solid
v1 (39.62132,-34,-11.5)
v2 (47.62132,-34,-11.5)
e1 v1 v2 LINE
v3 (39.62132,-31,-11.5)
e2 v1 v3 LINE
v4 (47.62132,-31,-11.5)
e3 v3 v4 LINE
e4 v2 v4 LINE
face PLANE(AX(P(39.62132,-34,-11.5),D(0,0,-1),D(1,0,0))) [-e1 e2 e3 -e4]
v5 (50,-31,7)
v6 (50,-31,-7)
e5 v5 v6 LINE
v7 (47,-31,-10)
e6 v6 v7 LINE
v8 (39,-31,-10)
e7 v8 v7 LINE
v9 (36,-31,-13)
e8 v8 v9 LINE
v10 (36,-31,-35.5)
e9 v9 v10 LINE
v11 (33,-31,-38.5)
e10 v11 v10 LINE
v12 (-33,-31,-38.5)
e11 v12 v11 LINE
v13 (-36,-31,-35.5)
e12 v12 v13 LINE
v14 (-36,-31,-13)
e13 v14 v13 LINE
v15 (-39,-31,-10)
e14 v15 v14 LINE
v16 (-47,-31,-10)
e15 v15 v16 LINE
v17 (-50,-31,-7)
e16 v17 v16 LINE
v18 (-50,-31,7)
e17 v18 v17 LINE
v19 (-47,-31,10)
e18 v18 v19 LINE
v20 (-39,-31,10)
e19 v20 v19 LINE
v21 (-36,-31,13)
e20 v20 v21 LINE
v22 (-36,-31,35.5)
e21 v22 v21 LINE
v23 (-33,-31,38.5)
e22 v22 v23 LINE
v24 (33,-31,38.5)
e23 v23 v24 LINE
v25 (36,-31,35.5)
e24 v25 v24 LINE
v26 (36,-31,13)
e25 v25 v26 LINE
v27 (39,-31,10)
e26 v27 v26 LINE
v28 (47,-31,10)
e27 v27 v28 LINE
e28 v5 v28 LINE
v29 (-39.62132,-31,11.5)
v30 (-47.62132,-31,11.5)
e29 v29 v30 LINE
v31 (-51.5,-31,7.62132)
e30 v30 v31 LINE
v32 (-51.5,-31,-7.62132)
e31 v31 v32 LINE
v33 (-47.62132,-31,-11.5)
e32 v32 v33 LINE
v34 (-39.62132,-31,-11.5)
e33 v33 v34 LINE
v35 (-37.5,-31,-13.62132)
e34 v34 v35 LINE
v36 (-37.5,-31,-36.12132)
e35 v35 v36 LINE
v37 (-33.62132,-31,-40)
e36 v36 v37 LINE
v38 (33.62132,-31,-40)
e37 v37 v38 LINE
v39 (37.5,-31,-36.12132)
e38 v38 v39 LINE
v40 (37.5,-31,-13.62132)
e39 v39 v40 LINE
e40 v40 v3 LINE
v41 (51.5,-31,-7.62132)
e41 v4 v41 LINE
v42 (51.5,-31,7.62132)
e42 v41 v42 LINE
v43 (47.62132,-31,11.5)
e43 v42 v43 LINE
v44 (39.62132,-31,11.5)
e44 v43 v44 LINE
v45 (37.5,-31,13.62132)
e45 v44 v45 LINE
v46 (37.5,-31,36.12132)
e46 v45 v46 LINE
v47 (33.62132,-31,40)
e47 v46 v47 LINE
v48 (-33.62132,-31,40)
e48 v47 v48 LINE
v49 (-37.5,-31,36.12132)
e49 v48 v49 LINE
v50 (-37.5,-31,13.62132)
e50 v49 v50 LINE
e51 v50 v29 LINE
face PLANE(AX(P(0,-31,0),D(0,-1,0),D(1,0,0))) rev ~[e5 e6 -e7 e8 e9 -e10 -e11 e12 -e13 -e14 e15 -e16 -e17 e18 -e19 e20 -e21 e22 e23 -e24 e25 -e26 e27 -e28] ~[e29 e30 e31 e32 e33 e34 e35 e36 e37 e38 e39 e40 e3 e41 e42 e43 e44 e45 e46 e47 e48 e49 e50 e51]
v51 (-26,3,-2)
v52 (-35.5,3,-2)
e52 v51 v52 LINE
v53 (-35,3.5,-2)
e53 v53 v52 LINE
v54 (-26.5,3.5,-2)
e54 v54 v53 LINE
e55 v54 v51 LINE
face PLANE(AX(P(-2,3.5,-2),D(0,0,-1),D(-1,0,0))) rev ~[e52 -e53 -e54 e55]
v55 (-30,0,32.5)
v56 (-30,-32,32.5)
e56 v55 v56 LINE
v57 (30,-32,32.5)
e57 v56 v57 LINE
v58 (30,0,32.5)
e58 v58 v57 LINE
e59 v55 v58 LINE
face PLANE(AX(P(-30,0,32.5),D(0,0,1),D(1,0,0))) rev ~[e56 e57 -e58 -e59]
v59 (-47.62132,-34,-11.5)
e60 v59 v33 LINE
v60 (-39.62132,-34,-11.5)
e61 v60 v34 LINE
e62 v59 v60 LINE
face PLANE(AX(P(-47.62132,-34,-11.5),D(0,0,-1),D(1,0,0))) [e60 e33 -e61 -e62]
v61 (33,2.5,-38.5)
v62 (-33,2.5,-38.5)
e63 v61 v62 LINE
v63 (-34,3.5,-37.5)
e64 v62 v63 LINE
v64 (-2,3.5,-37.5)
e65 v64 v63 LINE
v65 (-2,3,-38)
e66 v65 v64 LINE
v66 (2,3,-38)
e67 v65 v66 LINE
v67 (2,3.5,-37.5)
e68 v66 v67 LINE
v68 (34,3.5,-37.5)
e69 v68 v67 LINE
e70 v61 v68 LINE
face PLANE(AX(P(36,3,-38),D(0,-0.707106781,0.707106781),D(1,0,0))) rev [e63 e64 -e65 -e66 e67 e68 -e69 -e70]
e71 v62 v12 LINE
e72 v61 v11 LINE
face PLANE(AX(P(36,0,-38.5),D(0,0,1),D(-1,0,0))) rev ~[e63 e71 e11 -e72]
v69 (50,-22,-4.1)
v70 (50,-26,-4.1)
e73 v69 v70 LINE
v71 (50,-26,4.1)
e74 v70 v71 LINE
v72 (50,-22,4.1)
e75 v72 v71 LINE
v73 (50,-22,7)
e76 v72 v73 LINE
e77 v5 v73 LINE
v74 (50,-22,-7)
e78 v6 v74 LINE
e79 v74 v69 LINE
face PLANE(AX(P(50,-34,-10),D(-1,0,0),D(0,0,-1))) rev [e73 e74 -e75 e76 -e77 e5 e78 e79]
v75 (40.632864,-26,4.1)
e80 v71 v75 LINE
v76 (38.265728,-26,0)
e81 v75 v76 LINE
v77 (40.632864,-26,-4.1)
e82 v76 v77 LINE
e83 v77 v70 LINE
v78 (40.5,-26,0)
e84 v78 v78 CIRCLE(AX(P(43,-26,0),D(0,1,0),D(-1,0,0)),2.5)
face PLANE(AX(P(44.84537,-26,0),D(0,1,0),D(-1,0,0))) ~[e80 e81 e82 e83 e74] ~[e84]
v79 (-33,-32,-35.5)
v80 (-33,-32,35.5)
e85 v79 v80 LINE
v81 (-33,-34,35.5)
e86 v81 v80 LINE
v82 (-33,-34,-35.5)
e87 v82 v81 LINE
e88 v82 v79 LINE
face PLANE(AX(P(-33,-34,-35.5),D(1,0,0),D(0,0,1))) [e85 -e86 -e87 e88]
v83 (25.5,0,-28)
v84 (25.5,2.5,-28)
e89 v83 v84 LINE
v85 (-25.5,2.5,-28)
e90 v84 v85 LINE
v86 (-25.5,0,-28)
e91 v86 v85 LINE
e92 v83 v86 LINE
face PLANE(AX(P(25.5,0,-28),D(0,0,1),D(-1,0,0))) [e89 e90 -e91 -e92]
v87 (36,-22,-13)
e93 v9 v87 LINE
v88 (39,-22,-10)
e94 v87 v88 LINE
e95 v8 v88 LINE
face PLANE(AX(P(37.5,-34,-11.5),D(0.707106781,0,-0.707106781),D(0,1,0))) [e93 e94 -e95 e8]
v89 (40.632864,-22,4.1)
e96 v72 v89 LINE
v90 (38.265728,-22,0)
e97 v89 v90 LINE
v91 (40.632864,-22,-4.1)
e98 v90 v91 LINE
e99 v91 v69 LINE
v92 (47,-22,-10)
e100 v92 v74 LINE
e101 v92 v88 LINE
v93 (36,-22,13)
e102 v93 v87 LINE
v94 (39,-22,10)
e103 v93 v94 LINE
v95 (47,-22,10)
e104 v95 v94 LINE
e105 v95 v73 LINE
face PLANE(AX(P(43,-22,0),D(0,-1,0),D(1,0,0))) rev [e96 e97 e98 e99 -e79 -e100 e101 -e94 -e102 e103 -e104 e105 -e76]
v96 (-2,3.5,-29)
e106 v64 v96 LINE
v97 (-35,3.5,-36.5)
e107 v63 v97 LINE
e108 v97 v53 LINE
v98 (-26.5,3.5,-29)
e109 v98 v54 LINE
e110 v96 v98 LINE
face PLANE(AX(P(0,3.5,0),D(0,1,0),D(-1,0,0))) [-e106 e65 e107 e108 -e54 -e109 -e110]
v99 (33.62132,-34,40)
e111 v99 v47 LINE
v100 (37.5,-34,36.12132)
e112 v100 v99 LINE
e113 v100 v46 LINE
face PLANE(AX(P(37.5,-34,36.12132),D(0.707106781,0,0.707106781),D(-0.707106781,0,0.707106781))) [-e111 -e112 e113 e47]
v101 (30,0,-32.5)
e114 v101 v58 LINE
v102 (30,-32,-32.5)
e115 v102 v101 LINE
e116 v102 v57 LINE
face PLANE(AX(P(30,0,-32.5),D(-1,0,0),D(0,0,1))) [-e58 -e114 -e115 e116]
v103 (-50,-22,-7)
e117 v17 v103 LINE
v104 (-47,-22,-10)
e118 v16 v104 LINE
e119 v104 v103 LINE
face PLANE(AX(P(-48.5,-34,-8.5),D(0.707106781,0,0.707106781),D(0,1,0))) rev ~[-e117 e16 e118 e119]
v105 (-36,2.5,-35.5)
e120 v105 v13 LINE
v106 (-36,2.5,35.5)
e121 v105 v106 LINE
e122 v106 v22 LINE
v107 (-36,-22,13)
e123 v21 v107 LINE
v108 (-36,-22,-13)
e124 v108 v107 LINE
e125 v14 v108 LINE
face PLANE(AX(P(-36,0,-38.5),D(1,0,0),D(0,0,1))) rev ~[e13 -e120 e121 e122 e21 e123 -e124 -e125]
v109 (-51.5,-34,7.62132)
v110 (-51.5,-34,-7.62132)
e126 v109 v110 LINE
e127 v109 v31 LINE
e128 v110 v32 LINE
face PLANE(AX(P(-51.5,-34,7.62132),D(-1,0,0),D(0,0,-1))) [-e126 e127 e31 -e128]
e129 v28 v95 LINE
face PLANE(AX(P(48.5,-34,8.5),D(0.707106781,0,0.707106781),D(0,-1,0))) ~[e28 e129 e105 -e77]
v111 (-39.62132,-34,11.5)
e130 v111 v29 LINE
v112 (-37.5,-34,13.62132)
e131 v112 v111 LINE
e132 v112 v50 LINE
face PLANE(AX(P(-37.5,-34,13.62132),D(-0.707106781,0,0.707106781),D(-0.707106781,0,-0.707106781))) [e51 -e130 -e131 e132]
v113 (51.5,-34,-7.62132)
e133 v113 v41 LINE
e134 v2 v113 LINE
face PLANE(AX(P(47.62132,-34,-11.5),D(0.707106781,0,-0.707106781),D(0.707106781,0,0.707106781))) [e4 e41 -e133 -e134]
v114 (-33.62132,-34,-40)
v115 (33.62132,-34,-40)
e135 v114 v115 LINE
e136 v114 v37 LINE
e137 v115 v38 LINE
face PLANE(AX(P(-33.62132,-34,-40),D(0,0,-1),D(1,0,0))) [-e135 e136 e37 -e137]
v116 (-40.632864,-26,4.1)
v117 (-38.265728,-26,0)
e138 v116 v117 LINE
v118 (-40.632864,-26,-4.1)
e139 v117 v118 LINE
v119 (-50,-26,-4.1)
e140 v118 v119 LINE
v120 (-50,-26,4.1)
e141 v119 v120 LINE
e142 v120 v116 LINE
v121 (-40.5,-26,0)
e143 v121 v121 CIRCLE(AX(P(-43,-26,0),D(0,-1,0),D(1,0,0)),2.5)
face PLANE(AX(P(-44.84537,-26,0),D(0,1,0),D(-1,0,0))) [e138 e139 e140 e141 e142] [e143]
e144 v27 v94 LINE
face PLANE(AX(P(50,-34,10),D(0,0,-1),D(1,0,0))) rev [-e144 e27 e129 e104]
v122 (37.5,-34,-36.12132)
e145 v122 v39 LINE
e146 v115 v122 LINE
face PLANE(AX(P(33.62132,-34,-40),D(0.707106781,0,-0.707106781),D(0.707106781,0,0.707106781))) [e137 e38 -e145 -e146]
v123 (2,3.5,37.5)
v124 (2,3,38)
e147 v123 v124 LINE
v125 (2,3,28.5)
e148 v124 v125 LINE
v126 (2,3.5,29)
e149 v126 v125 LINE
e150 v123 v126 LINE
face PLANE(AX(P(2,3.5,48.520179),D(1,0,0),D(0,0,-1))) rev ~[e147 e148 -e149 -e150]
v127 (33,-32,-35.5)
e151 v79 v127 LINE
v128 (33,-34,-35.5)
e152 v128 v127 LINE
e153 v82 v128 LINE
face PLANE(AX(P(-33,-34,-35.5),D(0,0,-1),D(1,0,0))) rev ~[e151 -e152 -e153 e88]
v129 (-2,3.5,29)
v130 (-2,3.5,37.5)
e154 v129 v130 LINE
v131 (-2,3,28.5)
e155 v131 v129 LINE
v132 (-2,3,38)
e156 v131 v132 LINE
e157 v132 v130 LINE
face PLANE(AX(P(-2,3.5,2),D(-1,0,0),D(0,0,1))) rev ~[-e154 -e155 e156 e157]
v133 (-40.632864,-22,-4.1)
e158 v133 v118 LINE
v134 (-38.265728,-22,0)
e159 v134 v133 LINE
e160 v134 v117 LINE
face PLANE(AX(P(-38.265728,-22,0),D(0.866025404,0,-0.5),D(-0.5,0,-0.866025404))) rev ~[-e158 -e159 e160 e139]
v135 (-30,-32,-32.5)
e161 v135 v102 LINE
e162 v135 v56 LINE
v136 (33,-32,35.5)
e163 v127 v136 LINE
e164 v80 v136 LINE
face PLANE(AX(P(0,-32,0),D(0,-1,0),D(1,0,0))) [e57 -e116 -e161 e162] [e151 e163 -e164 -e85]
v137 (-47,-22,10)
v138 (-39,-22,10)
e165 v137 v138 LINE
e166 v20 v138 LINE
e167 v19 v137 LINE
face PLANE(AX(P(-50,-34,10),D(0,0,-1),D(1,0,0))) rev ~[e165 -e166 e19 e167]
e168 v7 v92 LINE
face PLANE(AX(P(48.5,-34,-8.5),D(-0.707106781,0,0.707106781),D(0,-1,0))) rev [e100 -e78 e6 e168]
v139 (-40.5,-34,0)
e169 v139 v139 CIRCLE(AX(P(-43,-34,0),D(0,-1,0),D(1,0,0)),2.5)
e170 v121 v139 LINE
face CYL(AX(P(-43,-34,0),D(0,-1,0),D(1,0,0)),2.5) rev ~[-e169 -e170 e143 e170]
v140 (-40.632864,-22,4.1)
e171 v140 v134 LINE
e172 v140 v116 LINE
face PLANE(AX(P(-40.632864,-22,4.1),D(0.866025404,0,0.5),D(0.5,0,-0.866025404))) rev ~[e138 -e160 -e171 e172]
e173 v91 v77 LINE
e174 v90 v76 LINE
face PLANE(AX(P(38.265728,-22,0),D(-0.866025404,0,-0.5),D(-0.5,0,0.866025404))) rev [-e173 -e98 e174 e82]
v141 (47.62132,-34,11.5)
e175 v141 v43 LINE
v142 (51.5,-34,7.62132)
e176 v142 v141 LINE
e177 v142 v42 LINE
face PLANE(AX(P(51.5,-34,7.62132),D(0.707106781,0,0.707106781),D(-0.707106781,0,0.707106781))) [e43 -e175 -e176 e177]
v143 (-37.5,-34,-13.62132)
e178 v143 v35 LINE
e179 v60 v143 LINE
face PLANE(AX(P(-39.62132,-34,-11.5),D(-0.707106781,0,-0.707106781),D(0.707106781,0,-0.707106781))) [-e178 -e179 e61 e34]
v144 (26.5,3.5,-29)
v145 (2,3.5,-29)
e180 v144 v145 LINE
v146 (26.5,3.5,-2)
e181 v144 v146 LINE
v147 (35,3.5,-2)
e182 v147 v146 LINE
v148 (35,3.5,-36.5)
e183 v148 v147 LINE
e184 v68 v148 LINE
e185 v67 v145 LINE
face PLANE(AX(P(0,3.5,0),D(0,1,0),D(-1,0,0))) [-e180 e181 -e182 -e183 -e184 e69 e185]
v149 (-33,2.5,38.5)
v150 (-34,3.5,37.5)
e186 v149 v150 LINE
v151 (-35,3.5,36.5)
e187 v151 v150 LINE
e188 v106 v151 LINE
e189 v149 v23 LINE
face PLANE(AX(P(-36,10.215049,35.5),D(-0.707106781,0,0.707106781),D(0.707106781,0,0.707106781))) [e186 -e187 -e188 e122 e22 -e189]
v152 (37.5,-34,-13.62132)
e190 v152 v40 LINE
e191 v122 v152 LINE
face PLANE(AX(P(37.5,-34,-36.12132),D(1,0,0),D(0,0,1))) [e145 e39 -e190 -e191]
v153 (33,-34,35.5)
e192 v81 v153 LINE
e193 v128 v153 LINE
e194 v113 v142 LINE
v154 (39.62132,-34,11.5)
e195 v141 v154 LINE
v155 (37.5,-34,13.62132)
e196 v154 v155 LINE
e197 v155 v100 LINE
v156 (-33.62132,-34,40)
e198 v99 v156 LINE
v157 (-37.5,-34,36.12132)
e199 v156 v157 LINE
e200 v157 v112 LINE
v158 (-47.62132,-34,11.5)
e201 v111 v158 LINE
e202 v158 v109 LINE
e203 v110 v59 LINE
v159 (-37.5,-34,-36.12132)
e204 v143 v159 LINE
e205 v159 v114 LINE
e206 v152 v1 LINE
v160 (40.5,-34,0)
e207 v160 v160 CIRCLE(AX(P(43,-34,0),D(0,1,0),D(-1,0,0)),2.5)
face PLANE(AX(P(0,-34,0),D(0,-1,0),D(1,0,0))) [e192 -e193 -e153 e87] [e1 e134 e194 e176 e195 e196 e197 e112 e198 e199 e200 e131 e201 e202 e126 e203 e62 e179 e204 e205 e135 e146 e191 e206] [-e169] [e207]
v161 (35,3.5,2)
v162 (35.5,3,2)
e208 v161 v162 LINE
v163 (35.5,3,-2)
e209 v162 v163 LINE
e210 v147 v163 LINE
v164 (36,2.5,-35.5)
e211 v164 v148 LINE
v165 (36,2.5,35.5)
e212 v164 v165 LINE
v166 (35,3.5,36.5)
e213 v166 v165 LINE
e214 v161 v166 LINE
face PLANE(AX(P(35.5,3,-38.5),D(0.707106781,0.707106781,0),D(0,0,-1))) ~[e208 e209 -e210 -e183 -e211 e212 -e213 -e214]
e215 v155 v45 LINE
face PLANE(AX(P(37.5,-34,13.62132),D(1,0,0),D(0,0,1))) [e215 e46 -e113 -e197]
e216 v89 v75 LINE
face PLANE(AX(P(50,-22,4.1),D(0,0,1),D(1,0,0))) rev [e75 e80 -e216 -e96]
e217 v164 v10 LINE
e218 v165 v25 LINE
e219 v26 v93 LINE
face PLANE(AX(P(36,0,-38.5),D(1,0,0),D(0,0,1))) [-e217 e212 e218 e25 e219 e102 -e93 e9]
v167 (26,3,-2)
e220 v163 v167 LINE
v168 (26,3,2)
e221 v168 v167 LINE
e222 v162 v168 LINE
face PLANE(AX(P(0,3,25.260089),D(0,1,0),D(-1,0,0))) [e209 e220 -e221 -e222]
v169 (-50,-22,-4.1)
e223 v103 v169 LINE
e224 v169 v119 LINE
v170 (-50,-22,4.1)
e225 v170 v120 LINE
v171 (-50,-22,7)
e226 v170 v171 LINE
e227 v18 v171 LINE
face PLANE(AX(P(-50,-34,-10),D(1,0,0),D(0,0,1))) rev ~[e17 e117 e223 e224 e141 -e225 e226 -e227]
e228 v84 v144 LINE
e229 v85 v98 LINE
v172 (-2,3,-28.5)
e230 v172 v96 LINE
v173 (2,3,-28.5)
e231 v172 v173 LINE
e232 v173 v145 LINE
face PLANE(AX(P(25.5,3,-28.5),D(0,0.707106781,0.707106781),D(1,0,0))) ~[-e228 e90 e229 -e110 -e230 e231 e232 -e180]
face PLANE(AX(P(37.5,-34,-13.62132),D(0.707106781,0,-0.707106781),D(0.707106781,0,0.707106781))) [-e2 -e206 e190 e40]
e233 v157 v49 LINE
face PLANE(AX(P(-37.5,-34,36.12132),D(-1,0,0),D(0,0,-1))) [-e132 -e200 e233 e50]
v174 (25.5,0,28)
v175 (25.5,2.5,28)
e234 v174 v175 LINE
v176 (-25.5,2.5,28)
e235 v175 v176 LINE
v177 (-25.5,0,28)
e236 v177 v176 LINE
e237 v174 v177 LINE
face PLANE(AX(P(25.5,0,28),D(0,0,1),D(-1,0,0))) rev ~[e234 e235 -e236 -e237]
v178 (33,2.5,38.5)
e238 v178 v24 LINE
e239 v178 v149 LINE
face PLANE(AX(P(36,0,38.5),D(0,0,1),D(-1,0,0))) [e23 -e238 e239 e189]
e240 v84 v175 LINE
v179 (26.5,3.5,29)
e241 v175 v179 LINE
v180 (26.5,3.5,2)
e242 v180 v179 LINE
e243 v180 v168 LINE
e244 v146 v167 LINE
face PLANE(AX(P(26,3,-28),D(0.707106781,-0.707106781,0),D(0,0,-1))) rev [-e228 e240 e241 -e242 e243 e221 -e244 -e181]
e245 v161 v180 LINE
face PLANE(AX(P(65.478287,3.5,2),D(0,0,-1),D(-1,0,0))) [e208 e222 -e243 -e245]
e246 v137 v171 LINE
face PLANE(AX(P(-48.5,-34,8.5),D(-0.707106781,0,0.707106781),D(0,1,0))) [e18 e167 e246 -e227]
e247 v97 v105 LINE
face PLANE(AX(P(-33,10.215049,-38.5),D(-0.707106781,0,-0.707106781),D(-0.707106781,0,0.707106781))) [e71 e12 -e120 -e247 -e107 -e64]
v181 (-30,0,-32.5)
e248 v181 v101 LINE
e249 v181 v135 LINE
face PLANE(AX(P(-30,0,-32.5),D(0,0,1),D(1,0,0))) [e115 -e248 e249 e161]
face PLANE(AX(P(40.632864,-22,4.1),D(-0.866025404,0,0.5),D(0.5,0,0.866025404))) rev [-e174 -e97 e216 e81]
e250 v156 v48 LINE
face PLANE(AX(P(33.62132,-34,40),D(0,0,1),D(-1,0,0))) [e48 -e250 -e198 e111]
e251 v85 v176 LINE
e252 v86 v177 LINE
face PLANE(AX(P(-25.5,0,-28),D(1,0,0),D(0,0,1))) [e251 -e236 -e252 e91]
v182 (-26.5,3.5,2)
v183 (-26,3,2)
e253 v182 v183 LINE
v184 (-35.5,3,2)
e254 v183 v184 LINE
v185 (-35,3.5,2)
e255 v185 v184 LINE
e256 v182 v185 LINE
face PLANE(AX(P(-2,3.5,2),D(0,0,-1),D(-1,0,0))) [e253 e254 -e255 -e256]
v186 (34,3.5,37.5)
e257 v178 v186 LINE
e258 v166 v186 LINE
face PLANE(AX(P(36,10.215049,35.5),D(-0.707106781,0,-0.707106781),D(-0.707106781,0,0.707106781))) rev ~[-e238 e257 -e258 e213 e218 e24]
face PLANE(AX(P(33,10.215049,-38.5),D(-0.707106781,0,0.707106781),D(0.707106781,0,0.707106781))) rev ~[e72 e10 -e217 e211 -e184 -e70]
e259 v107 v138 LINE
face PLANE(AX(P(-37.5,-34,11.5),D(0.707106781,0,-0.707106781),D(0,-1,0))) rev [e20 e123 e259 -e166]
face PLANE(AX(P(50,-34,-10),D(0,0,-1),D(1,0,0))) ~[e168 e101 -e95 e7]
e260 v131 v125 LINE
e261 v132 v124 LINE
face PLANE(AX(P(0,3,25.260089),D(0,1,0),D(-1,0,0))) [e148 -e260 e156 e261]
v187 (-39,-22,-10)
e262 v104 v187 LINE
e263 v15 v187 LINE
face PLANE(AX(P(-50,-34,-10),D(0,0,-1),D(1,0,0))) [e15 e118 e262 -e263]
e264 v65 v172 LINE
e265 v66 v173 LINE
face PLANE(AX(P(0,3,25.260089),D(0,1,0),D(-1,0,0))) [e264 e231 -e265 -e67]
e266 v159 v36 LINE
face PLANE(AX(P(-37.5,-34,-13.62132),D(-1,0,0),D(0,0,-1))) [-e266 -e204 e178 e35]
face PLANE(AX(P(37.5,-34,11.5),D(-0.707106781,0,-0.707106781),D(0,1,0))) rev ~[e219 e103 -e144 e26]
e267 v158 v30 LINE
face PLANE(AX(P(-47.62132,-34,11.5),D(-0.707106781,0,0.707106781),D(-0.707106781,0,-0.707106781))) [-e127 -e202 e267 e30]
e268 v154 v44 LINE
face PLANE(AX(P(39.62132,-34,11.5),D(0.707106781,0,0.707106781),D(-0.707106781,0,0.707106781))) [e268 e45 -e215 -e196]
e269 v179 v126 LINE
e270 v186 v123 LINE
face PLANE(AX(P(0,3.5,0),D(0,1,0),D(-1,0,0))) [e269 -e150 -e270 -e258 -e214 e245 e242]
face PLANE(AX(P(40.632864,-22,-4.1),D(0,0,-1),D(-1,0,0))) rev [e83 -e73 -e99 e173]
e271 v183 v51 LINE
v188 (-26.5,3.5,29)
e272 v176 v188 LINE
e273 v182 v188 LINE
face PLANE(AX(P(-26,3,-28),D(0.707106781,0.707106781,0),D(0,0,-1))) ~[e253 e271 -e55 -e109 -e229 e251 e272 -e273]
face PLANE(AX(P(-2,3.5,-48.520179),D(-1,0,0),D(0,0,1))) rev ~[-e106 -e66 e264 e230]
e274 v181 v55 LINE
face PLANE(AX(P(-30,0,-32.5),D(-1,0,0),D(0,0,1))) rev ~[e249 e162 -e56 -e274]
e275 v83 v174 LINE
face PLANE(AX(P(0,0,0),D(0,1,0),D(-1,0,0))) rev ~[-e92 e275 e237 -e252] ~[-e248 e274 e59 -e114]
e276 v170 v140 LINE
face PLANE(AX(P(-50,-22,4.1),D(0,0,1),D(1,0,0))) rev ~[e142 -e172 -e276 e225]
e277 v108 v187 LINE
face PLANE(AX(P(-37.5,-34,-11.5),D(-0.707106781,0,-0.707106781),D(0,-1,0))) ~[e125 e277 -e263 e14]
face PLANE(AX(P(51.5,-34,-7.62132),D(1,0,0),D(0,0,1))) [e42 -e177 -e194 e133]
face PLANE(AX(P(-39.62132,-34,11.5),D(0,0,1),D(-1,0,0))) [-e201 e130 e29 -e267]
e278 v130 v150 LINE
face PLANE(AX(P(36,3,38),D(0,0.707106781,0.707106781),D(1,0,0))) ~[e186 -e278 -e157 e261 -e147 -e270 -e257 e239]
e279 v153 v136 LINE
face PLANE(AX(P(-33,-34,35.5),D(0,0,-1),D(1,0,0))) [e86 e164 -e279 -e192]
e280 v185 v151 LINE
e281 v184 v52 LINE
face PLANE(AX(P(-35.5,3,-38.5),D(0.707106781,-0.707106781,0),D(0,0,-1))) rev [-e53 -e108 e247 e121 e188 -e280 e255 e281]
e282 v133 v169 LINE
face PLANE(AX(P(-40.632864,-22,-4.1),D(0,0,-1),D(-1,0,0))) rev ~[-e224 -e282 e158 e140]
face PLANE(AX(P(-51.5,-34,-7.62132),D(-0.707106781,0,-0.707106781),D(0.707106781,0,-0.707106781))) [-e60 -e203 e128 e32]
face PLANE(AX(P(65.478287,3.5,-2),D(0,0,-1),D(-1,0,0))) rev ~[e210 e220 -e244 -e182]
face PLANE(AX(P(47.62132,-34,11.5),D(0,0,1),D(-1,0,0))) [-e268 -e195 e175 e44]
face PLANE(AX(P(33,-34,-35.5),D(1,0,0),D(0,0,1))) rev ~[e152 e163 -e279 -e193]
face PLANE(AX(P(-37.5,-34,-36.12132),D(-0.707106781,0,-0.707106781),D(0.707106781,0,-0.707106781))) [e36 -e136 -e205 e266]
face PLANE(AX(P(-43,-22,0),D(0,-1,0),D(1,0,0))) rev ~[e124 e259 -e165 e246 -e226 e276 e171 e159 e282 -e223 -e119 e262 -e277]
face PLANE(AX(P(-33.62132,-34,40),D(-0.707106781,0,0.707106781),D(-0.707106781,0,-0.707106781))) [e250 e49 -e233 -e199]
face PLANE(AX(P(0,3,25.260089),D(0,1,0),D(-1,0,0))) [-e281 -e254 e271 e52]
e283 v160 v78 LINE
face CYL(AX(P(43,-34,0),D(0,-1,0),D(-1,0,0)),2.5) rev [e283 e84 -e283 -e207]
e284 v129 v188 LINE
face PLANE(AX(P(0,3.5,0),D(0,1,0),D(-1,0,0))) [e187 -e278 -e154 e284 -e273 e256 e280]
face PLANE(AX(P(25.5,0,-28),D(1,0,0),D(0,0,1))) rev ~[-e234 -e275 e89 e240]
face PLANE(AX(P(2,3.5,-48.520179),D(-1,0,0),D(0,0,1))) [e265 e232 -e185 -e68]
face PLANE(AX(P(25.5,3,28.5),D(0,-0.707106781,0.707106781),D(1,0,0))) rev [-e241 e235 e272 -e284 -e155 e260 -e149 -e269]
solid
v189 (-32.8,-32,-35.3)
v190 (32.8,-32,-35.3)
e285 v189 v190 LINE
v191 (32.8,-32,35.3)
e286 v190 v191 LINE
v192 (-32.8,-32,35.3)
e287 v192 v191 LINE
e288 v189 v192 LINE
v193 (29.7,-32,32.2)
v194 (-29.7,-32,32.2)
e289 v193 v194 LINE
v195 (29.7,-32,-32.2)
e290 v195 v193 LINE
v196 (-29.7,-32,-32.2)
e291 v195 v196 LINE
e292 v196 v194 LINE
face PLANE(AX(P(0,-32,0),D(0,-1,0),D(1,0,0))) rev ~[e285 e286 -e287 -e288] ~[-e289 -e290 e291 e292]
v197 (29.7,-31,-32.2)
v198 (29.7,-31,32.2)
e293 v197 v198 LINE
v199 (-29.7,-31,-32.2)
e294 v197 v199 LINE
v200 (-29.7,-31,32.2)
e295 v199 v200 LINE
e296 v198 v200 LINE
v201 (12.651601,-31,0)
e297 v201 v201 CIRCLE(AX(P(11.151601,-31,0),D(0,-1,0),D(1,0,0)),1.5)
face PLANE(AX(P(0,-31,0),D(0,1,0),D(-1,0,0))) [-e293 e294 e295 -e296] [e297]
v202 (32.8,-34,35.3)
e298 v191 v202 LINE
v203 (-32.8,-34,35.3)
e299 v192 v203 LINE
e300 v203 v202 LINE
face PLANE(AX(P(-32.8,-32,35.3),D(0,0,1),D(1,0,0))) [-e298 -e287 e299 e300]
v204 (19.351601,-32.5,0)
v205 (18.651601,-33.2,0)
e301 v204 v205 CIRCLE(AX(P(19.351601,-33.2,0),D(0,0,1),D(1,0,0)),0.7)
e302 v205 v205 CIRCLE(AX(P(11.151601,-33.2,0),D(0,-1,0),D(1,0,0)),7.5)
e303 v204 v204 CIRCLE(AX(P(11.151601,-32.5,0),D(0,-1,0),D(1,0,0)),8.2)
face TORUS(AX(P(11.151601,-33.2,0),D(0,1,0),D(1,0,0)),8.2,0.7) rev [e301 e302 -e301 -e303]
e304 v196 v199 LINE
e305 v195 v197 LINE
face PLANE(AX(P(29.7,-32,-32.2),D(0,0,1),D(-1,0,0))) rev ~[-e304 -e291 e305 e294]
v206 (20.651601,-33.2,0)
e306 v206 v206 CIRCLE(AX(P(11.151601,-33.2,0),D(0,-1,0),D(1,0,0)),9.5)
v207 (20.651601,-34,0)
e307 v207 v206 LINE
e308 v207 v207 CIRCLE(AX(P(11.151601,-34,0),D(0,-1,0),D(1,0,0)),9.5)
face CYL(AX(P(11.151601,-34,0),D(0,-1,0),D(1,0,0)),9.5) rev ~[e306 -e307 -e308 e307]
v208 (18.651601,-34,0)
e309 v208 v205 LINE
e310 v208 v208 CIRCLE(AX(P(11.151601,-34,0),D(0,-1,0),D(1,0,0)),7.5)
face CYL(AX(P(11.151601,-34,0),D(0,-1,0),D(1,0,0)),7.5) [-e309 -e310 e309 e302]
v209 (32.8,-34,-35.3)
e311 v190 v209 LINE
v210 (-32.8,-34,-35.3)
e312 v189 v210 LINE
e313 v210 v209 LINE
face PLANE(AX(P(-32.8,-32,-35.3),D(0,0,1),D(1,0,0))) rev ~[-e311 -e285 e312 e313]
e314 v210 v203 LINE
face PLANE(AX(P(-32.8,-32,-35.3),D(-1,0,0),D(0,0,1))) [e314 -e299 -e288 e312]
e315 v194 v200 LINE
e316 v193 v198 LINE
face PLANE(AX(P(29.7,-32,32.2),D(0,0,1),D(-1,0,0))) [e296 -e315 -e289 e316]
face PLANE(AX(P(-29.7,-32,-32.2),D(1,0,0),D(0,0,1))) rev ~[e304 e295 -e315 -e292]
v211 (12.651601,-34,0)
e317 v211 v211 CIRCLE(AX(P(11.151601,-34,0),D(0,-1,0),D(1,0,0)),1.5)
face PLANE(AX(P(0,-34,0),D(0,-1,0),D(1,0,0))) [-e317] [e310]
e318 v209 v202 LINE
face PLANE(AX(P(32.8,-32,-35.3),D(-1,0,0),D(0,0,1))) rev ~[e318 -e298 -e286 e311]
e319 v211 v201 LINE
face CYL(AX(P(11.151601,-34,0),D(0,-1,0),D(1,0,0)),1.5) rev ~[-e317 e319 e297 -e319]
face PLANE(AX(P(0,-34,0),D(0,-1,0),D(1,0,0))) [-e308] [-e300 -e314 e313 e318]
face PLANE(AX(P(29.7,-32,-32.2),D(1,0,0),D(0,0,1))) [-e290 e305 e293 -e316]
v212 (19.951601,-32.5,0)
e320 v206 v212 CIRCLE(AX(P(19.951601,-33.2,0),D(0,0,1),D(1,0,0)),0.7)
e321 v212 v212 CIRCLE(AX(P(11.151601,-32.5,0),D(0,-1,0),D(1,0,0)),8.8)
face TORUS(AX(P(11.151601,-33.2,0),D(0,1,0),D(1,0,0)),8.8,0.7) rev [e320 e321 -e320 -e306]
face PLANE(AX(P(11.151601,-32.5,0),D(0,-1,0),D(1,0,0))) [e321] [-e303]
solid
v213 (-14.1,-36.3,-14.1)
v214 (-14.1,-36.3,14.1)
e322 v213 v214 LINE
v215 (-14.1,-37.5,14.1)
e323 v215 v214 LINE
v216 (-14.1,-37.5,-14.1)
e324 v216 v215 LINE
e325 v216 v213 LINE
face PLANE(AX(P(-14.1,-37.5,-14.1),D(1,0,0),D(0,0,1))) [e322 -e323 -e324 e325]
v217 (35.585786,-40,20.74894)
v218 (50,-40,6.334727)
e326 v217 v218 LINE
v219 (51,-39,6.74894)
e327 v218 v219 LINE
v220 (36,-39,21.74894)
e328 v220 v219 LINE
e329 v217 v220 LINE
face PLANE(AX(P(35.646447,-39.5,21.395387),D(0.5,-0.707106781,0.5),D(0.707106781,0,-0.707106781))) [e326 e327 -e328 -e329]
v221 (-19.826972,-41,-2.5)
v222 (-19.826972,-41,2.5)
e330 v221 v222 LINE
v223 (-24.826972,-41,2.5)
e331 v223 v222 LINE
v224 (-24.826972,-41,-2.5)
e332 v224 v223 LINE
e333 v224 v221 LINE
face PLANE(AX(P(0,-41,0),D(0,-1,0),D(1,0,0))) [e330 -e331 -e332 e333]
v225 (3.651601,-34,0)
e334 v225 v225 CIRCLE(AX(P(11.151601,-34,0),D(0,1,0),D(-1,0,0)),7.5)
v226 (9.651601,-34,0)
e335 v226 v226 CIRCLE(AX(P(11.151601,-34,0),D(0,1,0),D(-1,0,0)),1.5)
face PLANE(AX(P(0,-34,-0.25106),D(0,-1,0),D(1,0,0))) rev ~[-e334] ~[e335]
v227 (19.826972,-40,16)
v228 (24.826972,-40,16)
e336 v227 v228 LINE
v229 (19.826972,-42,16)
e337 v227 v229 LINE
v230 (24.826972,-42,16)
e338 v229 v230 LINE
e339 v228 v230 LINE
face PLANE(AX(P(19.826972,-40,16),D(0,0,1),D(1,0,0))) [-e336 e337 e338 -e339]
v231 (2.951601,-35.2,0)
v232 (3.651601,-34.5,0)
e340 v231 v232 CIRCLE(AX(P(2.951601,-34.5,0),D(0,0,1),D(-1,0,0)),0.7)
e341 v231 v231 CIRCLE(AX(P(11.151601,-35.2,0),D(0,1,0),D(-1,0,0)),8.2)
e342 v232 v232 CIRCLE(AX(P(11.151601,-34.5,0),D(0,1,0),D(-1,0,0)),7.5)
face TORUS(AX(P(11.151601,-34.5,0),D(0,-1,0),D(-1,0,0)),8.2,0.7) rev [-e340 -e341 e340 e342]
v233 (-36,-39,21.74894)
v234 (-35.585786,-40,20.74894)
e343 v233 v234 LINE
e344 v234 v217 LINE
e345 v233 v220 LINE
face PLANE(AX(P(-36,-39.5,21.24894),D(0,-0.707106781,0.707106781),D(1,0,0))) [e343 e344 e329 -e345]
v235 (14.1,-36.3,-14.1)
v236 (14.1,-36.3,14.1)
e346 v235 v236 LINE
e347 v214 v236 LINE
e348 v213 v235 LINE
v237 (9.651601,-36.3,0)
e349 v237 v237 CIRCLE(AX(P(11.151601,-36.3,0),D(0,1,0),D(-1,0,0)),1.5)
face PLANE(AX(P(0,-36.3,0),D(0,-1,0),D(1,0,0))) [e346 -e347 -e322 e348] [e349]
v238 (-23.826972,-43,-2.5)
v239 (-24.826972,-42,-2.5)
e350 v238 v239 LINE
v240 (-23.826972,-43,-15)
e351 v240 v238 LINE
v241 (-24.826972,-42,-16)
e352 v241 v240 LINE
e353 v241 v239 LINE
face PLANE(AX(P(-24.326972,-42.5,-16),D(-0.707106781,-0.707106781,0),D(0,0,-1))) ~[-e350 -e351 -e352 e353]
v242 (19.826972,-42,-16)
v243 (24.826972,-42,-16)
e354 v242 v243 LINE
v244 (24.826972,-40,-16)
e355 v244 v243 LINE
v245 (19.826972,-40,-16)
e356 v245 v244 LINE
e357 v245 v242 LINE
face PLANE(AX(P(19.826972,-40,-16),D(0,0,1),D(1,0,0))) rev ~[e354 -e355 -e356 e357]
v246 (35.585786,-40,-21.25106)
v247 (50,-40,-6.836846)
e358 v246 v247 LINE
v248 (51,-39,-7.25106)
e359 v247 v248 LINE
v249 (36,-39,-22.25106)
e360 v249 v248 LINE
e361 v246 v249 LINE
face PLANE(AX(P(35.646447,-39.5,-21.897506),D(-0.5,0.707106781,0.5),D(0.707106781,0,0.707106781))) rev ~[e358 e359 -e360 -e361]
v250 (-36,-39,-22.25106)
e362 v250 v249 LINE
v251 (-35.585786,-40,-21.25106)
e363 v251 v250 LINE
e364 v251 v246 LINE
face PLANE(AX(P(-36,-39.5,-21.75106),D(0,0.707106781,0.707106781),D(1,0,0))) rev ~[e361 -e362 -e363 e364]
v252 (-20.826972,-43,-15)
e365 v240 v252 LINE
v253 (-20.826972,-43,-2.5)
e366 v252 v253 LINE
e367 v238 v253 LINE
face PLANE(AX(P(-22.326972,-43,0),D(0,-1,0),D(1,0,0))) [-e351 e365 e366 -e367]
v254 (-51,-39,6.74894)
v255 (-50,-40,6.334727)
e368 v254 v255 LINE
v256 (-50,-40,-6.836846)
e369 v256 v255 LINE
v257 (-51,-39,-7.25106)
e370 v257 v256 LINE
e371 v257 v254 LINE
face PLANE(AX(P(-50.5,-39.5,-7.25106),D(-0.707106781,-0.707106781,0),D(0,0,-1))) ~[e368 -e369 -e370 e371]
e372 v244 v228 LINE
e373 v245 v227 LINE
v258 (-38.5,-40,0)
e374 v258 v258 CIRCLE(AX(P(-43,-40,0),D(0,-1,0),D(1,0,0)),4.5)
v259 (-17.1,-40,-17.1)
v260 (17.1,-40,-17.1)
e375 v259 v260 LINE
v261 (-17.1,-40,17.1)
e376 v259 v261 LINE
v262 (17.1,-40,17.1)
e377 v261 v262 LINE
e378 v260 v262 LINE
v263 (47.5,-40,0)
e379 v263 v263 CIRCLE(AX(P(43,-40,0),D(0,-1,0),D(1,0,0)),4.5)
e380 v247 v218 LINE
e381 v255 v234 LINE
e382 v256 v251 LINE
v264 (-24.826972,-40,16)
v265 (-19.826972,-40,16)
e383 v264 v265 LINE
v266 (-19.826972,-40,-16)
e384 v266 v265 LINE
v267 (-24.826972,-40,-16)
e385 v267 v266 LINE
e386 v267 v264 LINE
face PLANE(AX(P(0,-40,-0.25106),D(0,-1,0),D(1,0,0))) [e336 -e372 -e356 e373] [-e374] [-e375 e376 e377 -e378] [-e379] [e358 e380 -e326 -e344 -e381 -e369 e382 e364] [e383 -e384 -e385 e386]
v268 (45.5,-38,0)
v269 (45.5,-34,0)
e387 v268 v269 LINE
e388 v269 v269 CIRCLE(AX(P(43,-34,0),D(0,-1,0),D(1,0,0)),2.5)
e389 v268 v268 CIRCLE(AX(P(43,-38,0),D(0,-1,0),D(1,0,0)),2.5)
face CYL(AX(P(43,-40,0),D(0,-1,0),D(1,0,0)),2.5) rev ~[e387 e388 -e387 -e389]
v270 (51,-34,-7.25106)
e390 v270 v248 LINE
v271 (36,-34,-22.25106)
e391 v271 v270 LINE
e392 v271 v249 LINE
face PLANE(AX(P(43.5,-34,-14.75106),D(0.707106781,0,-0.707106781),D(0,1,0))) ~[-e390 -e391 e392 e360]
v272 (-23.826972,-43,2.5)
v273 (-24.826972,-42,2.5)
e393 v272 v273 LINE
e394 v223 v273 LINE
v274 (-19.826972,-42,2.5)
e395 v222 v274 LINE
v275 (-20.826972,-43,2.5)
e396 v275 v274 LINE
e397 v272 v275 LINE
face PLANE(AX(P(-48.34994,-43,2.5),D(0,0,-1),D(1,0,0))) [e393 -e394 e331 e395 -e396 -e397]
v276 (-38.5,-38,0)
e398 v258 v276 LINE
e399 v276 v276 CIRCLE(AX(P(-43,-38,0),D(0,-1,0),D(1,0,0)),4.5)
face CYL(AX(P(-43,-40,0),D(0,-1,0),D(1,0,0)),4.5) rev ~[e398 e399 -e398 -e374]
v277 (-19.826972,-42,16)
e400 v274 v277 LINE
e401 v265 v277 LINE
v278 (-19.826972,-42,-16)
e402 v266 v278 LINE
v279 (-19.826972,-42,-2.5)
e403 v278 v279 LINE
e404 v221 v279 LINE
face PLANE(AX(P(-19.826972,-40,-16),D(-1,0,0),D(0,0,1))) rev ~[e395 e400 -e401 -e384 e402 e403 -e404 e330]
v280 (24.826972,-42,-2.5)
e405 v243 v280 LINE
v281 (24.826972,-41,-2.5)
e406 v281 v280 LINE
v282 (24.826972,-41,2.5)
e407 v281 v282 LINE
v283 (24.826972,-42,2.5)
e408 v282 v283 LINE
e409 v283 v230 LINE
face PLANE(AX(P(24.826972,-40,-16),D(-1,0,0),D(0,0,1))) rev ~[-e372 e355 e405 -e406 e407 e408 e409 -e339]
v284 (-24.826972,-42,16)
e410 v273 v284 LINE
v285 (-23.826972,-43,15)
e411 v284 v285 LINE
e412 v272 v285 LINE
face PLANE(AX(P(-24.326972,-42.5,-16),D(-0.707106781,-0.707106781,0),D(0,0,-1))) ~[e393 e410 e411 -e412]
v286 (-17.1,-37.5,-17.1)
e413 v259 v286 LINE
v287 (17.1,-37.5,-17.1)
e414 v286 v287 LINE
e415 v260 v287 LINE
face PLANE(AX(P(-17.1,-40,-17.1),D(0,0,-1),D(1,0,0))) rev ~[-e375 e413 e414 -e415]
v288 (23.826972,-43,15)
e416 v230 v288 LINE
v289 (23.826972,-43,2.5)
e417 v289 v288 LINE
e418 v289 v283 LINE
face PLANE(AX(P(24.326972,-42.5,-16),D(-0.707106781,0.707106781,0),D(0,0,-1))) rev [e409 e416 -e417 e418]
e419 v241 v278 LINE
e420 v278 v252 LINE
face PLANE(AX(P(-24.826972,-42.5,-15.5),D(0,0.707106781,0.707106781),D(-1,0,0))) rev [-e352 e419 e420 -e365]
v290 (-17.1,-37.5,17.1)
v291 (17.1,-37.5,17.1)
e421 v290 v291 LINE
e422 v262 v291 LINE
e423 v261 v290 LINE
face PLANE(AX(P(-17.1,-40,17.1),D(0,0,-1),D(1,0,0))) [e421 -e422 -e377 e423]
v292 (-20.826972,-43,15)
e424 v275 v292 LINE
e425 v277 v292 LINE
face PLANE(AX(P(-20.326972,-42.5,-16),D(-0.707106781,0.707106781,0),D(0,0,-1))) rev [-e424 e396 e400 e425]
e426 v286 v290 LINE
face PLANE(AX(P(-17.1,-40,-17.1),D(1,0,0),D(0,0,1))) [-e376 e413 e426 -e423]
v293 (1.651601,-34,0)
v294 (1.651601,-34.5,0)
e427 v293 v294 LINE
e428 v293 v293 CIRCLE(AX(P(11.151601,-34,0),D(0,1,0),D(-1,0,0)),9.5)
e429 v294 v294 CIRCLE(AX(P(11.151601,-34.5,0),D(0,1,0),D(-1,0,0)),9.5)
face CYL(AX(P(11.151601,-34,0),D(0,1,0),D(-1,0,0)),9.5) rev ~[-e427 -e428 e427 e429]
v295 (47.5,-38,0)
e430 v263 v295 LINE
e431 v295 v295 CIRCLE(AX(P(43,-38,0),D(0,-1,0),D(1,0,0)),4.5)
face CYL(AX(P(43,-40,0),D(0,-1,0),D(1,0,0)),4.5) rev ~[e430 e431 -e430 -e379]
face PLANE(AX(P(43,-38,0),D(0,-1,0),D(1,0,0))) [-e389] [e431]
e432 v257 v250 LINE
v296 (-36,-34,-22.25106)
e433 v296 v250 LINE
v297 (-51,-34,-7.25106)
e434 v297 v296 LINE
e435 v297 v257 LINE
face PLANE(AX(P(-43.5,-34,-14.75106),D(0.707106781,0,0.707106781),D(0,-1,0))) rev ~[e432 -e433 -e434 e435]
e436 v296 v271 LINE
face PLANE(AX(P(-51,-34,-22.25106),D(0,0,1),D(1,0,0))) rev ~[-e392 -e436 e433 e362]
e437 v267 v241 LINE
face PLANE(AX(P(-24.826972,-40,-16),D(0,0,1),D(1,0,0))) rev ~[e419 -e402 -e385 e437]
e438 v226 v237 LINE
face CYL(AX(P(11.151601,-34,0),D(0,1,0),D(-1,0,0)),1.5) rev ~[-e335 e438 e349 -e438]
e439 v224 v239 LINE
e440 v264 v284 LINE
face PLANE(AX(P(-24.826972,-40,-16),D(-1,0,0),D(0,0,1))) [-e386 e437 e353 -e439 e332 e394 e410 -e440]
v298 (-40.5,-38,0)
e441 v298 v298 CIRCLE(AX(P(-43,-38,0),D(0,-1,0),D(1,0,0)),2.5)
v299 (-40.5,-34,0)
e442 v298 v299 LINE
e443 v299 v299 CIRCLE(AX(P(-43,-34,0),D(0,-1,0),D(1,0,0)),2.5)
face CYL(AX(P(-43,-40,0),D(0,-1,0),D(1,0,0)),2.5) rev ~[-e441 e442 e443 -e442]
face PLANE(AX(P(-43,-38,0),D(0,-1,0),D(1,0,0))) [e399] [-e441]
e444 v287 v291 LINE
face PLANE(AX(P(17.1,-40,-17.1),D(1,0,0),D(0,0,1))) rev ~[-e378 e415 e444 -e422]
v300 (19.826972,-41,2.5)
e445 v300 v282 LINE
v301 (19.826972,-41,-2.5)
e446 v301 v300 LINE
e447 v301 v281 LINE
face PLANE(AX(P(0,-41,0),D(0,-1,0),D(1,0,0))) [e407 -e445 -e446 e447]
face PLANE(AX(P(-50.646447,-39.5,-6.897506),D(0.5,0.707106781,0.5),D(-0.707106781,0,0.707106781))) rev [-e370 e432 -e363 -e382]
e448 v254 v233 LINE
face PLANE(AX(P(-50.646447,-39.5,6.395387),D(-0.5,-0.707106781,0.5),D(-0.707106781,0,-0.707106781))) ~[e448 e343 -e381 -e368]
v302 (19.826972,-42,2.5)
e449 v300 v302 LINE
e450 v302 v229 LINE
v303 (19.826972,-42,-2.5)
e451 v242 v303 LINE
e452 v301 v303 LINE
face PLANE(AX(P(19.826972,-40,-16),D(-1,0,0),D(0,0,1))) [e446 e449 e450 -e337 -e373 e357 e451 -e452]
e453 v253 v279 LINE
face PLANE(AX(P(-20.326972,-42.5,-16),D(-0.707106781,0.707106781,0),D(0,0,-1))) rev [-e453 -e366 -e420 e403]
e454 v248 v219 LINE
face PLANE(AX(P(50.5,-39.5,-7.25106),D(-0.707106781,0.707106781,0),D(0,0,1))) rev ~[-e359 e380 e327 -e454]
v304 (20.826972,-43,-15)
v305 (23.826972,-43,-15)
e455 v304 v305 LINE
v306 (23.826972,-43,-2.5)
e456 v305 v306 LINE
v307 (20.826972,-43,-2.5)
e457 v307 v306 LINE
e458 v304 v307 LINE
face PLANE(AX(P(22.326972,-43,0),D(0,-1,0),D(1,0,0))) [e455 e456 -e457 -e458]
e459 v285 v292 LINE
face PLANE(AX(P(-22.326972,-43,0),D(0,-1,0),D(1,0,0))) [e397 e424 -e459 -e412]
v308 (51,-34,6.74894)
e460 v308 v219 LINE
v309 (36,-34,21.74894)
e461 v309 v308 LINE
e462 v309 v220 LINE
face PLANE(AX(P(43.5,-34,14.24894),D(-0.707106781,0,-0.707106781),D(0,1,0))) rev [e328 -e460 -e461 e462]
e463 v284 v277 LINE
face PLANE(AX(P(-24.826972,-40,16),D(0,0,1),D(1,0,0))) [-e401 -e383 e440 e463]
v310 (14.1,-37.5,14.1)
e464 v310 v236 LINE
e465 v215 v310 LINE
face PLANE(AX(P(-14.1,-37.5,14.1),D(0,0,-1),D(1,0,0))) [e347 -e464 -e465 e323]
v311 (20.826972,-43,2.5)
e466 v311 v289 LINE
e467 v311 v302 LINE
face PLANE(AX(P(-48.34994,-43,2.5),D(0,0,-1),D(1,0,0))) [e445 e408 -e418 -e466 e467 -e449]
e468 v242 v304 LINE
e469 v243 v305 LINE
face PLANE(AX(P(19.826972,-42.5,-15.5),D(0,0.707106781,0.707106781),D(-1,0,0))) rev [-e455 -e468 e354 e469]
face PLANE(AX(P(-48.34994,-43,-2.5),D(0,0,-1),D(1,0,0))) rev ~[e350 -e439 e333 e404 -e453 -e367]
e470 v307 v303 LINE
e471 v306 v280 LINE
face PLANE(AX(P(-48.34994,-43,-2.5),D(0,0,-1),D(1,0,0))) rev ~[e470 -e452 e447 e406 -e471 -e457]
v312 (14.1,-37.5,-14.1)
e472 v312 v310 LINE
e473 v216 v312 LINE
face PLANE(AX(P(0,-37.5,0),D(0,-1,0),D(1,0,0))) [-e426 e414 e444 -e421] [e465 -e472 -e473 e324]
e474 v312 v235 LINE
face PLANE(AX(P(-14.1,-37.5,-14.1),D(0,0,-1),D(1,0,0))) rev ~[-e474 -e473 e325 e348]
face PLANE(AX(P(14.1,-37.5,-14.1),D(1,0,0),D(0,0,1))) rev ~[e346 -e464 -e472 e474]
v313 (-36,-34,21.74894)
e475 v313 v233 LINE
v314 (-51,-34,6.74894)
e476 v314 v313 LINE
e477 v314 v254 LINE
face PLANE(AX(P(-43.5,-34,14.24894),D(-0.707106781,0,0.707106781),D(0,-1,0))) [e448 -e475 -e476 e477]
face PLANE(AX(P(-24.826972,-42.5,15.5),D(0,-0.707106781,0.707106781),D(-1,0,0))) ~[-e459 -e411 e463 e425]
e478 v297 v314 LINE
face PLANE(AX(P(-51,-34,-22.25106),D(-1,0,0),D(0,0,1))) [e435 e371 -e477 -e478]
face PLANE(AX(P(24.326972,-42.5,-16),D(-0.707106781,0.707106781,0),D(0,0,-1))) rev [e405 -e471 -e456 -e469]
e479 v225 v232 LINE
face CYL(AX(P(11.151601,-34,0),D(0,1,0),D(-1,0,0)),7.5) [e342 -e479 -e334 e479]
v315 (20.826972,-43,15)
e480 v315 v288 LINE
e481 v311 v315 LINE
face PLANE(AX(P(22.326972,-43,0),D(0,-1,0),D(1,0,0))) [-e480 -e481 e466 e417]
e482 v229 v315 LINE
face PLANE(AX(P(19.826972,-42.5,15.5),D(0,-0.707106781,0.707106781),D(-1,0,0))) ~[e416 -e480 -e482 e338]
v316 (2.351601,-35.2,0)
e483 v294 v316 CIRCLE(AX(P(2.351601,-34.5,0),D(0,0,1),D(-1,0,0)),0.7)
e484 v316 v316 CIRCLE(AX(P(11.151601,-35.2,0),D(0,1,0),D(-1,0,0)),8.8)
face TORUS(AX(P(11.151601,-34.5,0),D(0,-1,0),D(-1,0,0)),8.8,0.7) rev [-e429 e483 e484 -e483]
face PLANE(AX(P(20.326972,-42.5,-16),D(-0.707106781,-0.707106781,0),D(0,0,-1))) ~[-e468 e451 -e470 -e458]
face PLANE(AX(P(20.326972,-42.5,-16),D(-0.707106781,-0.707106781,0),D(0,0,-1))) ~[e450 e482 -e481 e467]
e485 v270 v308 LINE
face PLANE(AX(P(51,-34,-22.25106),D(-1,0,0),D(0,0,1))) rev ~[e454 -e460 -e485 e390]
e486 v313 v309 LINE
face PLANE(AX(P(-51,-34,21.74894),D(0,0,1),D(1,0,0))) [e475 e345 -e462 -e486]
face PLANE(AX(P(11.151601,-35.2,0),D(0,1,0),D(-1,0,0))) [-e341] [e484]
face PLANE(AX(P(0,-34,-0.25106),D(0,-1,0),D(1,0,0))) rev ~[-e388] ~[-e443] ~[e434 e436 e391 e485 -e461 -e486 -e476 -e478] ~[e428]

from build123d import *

# Parameters (mm, degrees)
F0_W        = 72
F0_H        = 77
F0_W_2      = 60
F0_H_2      = 65
F1_DEPTH    = 34
F2_W        = 72
F2_H        = 77
F2_W_2      = 51
F2_H_2      = 56
F3_DEPTH    = 3.5
F4_SIZE     = 1
F5_T1_DEPTH = 51.9300979278
F6_W        = 14
F6_H        = 20
F7_DEPTH    = 12
F9_DEPTH    = 4
F10_R       = 2.5
F11_DEPTH   = 37.501
F13_SIZE    = 3
F14_W       = 4
F14_H       = 46.5201788341
F14_W_2     = 63.4782873003
F14_H_2     = 4
F15_DEPTH   = 0.5
F16_R       = 2.5
F16_W       = 60
F16_H       = 65
F17_DEPTH   = 3
F18_W       = 66
F18_H       = 71
F19_DEPTH   = 2
F20_W       = 65.6
F20_H       = 70.6
F21_DEPTH   = 2
F22_W       = 59.4
F22_H       = 64.4
F23_DEPTH   = 1
F24_R       = 1.5
F25_DEPTH   = 37.501
F26_R       = 9.5
F26_R_2     = 7.5
F27_DEPTH   = 1.5
F28_R       = 0.7
F29_W       = 102
F29_H       = 44
F30_DEPTH   = 6
F31_R       = 2.5
F32_DEPTH   = 43.501
F33_R       = 4.5
F34_DEPTH   = 2
F35_SIZE    = 15
F36_W       = 34.2
F36_H       = 34.2
F37_DEPTH   = 2.5
F38_SIZE    = 1
F39_W       = 5
F39_H       = 32
F40_DEPTH   = 3
F41_SIZE    = 1
F42_W       = 96.6998805684
F42_H       = 5
F43_DEPTH   = 2
F44_W       = 28.2
F44_H       = 28.2
F45_DEPTH   = 1.2
F46_R       = 1.5
F47_DEPTH   = 9.001
F48_R       = 9.5
F48_R_2     = 7.5
F49_DEPTH   = 1.2
F50_R       = 0.7


# Not quite as in the source:
# - a fillet or chamfer that OpenCascade refuses, or shapes differently, is made with other operations: its cross-section is extruded or revolved along the edge and cut away or added


with BuildPart() as f1:
    # F0 (on Front) → F1 (new body)
    with BuildSketch(Plane.XZ):
        Rectangle(F0_W, F0_H)
        Rectangle(F0_W_2, F0_H_2, mode=Mode.SUBTRACT)
    extrude(amount=F1_DEPTH)

    # F2 (on face) → F3 (join)
    with BuildSketch(Plane(origin=(0, 0, 0), x_dir=(-1, 0, 0), z_dir=(0, 1, 0))):
        Rectangle(F2_W, F2_H)
        Rectangle(F2_W_2, F2_H_2, mode=Mode.SUBTRACT)
    extrude(amount=F3_DEPTH)

    # F4
    f4_edges = [f1.edges().sort_by_distance(p)[0] for p in [
        (36, 3.5, 0),
        (0, 3.5, -38.5),
        (-36, 3.5, 0),
        (0, 3.5, 38.5),
        (0, 3.5, -28),
        (25.5, 3.5, 0),
        (0, 3.5, 28),
        (-25.5, 3.5, 0),
    ]]
    chamfer(f4_edges, length=F4_SIZE)

    # F5: chamfer of 3 on 4 edges, made by hand

    # F5_s2 → F5_t1 (cut)
    with BuildSketch(Plane.XZ.offset(-10.2150489639)):
        Polygon((-36, 35.5), (-33, 38.5), (-36, 38.5), align=None)
        Polygon((36, 35.5), (33, 38.5), (36, 38.5), align=None)
        Polygon((33, -38.5), (36, -35.5), (36, -38.5), align=None)
        Polygon((-33, -38.5), (-36, -35.5), (-36, -38.5), align=None)
    extrude(amount=F5_T1_DEPTH, mode=Mode.SUBTRACT)

    # F6 (on face) → F7 (join)
    with BuildSketch(Plane.XZ.offset(34)):
        with Locations((-43, 0)):
            Rectangle(F6_W, F6_H)
    extrude(amount=-F7_DEPTH)

    # F8 (on face) → F9 (cut)
    with BuildSketch(Plane(origin=(0, -22, 0), x_dir=(-1, 0, 0), z_dir=(0, 1, 0))):
        Polygon((40.6328638963, -4.1), (45.3671361037, -4.1), (50, -4.1), (50, 4.1), (45.3671361037, 4.1), (40.6328638963, 4.1), (38.2657277926, 0), align=None)
    extrude(amount=-F9_DEPTH, mode=Mode.SUBTRACT)

    # F10 (on face) → F11 (cut, through all)
    with BuildSketch(Plane.XZ.offset(34)):
        with Locations((-43, 0)):
            Circle(F10_R)
    extrude(amount=-F11_DEPTH, mode=Mode.SUBTRACT)

    # F12: F1 across plane


with BuildPart() as f1_1:
    add(f1.part)
    add(f1.part.mirror(Plane.YZ))

    # F13
    f13_edges = [f1_1.edges().sort_by_distance(p)[0] for p in [
        (50, -28, -10),
        (36, -28, -10),
        (50, -28, 10),
        (36, -28, 10),
        (-36, -28, 10),
        (-50, -28, 10),
        (-36, -28, -10),
        (-50, -28, -10),
    ]]
    chamfer(f13_edges, length=F13_SIZE)

    # F14 (on face) → F15 (cut)
    with BuildSketch(Plane(origin=(0, 3.5, 0), x_dir=(-1, 0, 0), z_dir=(0, 1, 0))):
        with Locations((0, 25.2600894171)):
            Rectangle(F14_W, F14_H)
        with Locations((33.7391436501, 0)):
            Rectangle(F14_W_2, F14_H_2)
        Rectangle(F14_W, F14_H_2)
        with Locations((-33.7391436501, 0)):
            Rectangle(F14_W_2, F14_H_2)
        with Locations((0, -25.2600894171)):
            Rectangle(F14_W, F14_H)
    extrude(amount=-F15_DEPTH, mode=Mode.SUBTRACT)

    # F16 (on face) → F17 (join)
    with BuildSketch(Plane.XZ.offset(34)):
        Polygon((-39.6213203436, 11.5), (-47.6213203436, 11.5), (-51.5, 7.6213203436), (-51.5, -7.6213203436), (-47.6213203436, -11.5), (-39.6213203436, -11.5), (-37.5, -13.6213203436), (-37.5, -36.1213203436), (-33.6213203436, -40), (33.6213203436, -40), (37.5, -36.1213203436), (37.5, -13.6213203436), (39.6213203436, -11.5), (47.6213203436, -11.5), (51.5, -7.6213203436), (51.5, 7.6213203436), (47.6213203436, 11.5), (39.6213203436, 11.5), (37.5, 13.6213203436), (37.5, 36.1213203436), (33.6213203436, 40), (-33.6213203436, 40), (-37.5, 36.1213203436), (-37.5, 13.6213203436), align=None)
        with Locations((-43, 0)):
            Circle(F16_R, mode=Mode.SUBTRACT)
        Rectangle(F16_W, F16_H, mode=Mode.SUBTRACT)
        with Locations((43, 0)):
            Circle(F16_R, mode=Mode.SUBTRACT)
    extrude(amount=-F17_DEPTH)

    # F18 (on face) → F19 (cut)
    with BuildSketch(Plane.XZ.offset(34)):
        Rectangle(F18_W, F18_H)
    extrude(amount=-F19_DEPTH, mode=Mode.SUBTRACT)


with BuildPart() as f21:
    # F20 (on face) → F21 (new body, through all)
    with BuildSketch(Plane.XZ.offset(32)):
        Rectangle(F20_W, F20_H)
    extrude(amount=F21_DEPTH)

    # F22 (on face) → F23 (join)
    with BuildSketch(Plane(origin=(0, -32, 0), x_dir=(-1, 0, 0), z_dir=(0, 1, 0))):
        Rectangle(F22_W, F22_H)
    extrude(amount=F23_DEPTH)

    # F24 (on face) → F25 (cut, through all)
    with BuildSketch(Plane.XZ.offset(34)):
        with Locations((11.1516006291, 0)):
            Circle(F24_R)
    extrude(amount=-F25_DEPTH, mode=Mode.SUBTRACT)

    # F26 (on face) → F27 (cut)
    with BuildSketch(Plane.XZ.offset(34)):
        with Locations((11.1516006291, 0)):
            Circle(F26_R)
        with Locations((11.1516006291, 0)):
            Circle(F26_R_2, mode=Mode.SUBTRACT)
    extrude(amount=-F27_DEPTH, mode=Mode.SUBTRACT)

    # F28
    f28_edges = [f21.edges().sort_by_distance(p)[0] for p in [
        (1.651601, -32.5, 0),
        (3.651601, -32.5, 0),
    ]]
    fillet(f28_edges, radius=F28_R)


with BuildPart() as f30:
    # F29 (on face) → F30 (new body)
    with BuildSketch(Plane.XZ.offset(34)):
        with Locations((0, -0.2510596967)):
            Rectangle(F29_W, F29_H)
    extrude(amount=F30_DEPTH)

    # F31 (on face) → F32 (cut, through all)
    with BuildSketch(Plane.XZ.offset(40)):
        with Locations((43, 0)):
            Circle(F31_R)
        with Locations((-43, 0)):
            Circle(F31_R)
    extrude(amount=-F32_DEPTH, mode=Mode.SUBTRACT)

    # F33 (on face) → F34 (cut)
    with BuildSketch(Plane.XZ.offset(40)):
        with Locations((-43, 0)):
            Circle(F33_R)
        with Locations((43, 0)):
            Circle(F33_R)
    extrude(amount=-F34_DEPTH, mode=Mode.SUBTRACT)

    # F35
    f35_edges = [f30.edges().sort_by_distance(p)[0] for p in [
        (-51, -37, -22.25106),
        (51, -37, -22.25106),
        (51, -37, 21.74894),
        (-51, -37, 21.74894),
    ]]
    chamfer(f35_edges, length=F35_SIZE)

    # F36 (on face) → F37 (cut)
    with BuildSketch(Plane.XZ.offset(40)):
        Rectangle(F36_W, F36_H)
    extrude(amount=-F37_DEPTH, mode=Mode.SUBTRACT)

    # F38
    f38_edges = [f30.edges().sort_by_distance(p)[0] for p in [
        (0, -40, -22.25106),
        (-43.5, -40, -14.75106),
        (-51, -40, -0.25106),
        (-43.5, -40, 14.24894),
        (0, -40, 21.74894),
        (43.5, -40, 14.24894),
        (51, -40, -0.25106),
        (43.5, -40, -14.75106),
    ]]
    chamfer(f38_edges, length=F38_SIZE)

    # F39 (on face) → F40 (join)
    with BuildSketch(Plane.XZ.offset(40)):
        with Locations((22.3269723356, 0)):
            Rectangle(F39_W, F39_H)
        with Locations((-22.3269723356, 0)):
            Rectangle(F39_W, F39_H)
    extrude(amount=F40_DEPTH)

    # F41
    f41_edges = [f30.edges().sort_by_distance(p)[0] for p in [
        (19.826972, -43, 0),
        (22.326972, -43, -16),
        (24.826972, -43, 0),
        (22.326972, -43, 16),
        (-22.326972, -43, -16),
        (-19.826972, -43, 0),
        (-22.326972, -43, 16),
        (-24.826972, -43, 0),
    ]]
    chamfer(f41_edges, length=F41_SIZE)

    # F42 (on face) → F43 (cut)
    with BuildSketch(Plane.XZ.offset(43)):
        Rectangle(F42_W, F42_H)
    extrude(amount=-F43_DEPTH, mode=Mode.SUBTRACT)

    # F44 (on face) → F45 (cut)
    with BuildSketch(Plane.XZ.offset(37.5)):
        Rectangle(F44_W, F44_H)
    extrude(amount=-F45_DEPTH, mode=Mode.SUBTRACT)

    # F46 (on face) → F47 (cut, through all)
    with BuildSketch(Plane(origin=(0, -34, 0), x_dir=(-1, 0, 0), z_dir=(0, 1, 0))):
        with Locations((-11.1516006291, 0)):
            Circle(F46_R)
    extrude(amount=-F47_DEPTH, mode=Mode.SUBTRACT)

    # F48 (on face) → F49 (cut)
    with BuildSketch(Plane(origin=(0, -34, 0), x_dir=(-1, 0, 0), z_dir=(0, 1, 0))):
        with Locations((-11.1516006291, 0)):
            Circle(F48_R)
        with Locations((-11.1516006291, 0)):
            Circle(F48_R_2, mode=Mode.SUBTRACT)
    extrude(amount=-F49_DEPTH, mode=Mode.SUBTRACT)

    # F50
    f50_edges = [f30.edges().sort_by_distance(p)[0] for p in [
        (20.651601, -35.2, 0),
        (18.651601, -35.2, 0),
    ]]
    fillet(f50_edges, radius=F50_R)


solid = Compound([f1_1.part, f21.part, f30.part])
